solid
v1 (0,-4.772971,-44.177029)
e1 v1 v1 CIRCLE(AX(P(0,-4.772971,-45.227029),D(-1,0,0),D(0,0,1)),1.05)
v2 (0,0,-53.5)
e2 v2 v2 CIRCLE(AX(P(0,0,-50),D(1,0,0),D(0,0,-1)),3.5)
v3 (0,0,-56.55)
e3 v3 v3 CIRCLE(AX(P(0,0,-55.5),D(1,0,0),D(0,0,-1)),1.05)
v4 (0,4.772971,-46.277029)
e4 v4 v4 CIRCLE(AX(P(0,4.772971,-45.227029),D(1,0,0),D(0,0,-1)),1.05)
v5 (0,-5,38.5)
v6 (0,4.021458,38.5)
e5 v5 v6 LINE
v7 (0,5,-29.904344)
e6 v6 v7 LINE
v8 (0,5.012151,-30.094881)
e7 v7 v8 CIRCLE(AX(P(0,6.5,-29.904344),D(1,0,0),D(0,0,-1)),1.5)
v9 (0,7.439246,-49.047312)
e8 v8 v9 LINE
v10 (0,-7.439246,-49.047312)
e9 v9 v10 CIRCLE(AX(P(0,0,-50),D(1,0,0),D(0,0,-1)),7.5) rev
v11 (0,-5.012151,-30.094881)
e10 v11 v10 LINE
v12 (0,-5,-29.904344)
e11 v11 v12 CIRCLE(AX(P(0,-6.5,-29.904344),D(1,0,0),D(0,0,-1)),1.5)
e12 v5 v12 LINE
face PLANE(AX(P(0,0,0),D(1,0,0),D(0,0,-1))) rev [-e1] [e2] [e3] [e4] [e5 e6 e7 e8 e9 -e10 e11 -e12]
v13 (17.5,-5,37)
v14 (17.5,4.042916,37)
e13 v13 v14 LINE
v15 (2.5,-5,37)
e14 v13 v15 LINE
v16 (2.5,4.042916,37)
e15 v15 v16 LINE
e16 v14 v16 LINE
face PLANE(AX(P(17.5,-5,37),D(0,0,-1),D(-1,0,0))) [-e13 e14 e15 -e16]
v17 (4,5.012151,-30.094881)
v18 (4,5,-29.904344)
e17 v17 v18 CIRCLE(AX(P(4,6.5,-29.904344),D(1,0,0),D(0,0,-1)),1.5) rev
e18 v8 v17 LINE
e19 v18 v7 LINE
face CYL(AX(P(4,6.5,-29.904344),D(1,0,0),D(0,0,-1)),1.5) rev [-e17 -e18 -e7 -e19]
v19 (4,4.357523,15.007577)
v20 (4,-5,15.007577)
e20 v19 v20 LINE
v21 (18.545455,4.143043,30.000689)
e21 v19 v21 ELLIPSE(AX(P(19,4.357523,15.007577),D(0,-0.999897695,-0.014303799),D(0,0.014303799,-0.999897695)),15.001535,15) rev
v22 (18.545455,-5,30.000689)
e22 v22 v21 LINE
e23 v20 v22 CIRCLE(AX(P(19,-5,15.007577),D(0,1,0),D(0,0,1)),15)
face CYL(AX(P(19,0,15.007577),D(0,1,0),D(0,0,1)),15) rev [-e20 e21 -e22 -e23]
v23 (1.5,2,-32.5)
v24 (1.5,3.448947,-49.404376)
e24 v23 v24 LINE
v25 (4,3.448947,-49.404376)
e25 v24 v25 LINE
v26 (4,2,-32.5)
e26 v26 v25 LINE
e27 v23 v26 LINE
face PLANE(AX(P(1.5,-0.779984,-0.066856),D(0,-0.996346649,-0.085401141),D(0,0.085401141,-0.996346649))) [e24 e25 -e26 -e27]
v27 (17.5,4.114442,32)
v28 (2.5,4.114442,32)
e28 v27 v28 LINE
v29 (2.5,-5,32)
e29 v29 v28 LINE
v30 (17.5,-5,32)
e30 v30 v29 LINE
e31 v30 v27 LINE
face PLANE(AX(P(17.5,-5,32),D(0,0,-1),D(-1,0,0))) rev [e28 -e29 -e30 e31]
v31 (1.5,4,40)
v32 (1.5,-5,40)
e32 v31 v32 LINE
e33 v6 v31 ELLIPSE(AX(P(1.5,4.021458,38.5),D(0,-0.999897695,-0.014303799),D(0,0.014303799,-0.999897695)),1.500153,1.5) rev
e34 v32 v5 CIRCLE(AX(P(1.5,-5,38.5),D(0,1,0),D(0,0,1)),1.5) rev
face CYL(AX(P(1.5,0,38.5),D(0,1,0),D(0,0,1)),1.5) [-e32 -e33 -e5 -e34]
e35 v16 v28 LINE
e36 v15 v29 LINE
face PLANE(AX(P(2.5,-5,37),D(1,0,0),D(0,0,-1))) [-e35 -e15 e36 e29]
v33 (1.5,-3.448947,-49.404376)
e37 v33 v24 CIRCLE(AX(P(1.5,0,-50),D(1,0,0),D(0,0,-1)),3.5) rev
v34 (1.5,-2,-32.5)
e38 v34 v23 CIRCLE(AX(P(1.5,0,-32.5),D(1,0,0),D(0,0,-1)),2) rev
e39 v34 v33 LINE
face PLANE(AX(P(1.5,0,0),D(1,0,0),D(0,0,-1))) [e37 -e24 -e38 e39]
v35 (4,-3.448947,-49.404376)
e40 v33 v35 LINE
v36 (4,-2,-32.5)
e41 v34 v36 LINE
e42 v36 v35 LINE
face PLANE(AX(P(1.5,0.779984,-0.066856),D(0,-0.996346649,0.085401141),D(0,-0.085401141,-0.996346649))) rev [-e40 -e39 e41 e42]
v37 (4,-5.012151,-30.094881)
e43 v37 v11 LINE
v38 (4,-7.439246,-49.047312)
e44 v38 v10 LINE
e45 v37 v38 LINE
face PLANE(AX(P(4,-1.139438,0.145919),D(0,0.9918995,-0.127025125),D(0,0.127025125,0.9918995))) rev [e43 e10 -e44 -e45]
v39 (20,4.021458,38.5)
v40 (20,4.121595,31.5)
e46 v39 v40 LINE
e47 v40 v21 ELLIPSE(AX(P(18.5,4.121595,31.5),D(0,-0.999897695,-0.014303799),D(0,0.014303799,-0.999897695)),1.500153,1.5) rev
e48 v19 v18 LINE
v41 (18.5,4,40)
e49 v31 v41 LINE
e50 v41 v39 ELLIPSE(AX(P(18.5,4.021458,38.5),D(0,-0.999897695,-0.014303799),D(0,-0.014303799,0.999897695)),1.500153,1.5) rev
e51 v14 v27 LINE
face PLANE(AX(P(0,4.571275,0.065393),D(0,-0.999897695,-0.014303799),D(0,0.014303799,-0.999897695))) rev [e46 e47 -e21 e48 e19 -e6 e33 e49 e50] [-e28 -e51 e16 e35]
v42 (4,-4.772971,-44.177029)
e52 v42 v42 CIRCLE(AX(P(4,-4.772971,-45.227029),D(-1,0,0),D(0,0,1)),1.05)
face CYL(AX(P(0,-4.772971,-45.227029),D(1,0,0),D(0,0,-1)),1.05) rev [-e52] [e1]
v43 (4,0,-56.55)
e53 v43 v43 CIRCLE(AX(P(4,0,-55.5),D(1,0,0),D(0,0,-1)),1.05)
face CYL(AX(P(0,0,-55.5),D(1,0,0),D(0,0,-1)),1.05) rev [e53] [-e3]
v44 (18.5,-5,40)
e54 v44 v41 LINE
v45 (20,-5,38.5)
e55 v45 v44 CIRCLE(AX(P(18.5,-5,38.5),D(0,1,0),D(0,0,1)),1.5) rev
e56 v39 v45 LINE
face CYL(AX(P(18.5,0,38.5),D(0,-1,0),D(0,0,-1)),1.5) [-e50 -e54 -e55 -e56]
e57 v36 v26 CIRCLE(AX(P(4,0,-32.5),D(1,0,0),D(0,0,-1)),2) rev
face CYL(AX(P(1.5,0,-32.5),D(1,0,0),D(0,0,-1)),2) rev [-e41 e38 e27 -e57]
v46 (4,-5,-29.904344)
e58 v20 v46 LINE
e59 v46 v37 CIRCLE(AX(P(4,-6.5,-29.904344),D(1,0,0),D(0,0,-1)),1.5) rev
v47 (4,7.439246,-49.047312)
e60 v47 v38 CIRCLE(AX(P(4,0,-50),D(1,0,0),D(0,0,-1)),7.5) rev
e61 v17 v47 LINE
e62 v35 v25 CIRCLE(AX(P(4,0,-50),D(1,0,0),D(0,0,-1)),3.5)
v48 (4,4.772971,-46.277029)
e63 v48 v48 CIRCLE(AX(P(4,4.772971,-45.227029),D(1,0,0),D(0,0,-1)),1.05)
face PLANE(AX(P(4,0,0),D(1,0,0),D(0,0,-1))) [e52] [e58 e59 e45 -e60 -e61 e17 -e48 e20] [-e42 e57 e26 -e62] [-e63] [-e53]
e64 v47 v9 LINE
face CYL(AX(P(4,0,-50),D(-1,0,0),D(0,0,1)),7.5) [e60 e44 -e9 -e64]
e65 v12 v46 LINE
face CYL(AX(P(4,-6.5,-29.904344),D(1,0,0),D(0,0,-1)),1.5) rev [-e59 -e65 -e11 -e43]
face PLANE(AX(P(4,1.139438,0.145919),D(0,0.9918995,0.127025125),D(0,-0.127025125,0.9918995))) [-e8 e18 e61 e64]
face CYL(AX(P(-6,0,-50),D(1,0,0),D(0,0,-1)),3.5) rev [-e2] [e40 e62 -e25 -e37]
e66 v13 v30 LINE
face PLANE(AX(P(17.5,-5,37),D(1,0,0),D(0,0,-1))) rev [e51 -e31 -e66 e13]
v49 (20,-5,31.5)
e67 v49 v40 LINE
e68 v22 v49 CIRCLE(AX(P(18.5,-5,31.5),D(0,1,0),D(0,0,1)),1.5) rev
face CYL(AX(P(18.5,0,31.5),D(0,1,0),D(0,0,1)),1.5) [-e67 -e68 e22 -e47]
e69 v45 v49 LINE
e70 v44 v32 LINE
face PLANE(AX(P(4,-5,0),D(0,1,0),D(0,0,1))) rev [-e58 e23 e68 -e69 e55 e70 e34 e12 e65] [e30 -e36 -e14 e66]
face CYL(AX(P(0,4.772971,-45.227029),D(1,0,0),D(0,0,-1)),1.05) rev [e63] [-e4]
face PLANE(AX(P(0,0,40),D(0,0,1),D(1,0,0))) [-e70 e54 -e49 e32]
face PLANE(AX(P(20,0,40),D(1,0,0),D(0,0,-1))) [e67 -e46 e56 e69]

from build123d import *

# Parameters (mm, degrees)
BOSS_EXTRU_1_DEPTH      = 4
ESQUISSE2_R             = 3.5
ENL_V_MAT_EXTRU_1_DEPTH = 10
ENL_V_MAT_EXTRU_2_DEPTH = 2.5
ESQUISSE5_R             = 1.05
ENL_V_MAT_EXTRU_3_DEPTH = 59.124865591
ESQUISSE6_W             = 20
ESQUISSE6_H             = 10
BOSS_EXTRU_2_DEPTH      = 10
ESQUISSE7_W             = 15
ESQUISSE7_H             = 5
ENL_V_MAT_EXTRU_4_DEPTH = 10
CONG_2_R                = 1.5
CONG_3_R                = 15
ENL_V_START             = -20
ENL_V_MAT_EXTRU_5_DEPTH = 20


# Read off the part's stored shape, not the designer's step: Enlèv. mat.-Extru.5
with BuildPart() as part:
    # Esquisse1 → Boss.-Extru.1 (new body)
    with BuildSketch(Plane(origin=(0, 0, 0), x_dir=(0, 0, -1), z_dir=(1, 0, 0))):
        with BuildLine():
            Line((30, 5), (-30, 5))
            Line((-30, 5), (-30, -5))
            Line((-30, -5), (30, -5))
            Line((30, -5), (49.047311562, -7.439246248))
            ThreePointArc((49.047311562, -7.439246248), (57.484796152, -0.477311816), (50, 7.5))
            ThreePointArc((50, 7.5), (49.522688184, 7.484796152), (49.047311562, 7.439246248))
            Line((49.047311562, 7.439246248), (30, 5))
        make_face()
    extrude(amount=BOSS_EXTRU_1_DEPTH)

    # Esquisse2 → Enlèv. mat.-Extru.1 (cut)
    with BuildSketch(Plane(origin=(4, 0, 0), x_dir=(0, 0, -1), z_dir=(1, 0, 0))):
        with Locations((50, 0)):
            Circle(ESQUISSE2_R)
    extrude(amount=-ENL_V_MAT_EXTRU_1_DEPTH, mode=Mode.SUBTRACT)

    # Esquisse3 → Enlèv. mat.-Extru.2 (cut)
    with BuildSketch(Plane(origin=(4, 0, 0), x_dir=(0, 0, -1), z_dir=(1, 0, 0))):
        with BuildLine():
            Line((49.404376013, 3.448946515), (32.5, 2))
            ThreePointArc((32.5, 2), (30.5, 0), (32.5, -2))
            Line((32.5, -2), (49.404376013, -3.448946515))
            ThreePointArc((49.404376013, -3.448946515), (46.5, 0), (49.404376013, 3.448946515))
        make_face()
    extrude(amount=-ENL_V_MAT_EXTRU_2_DEPTH, mode=Mode.SUBTRACT)

    # Esquisse5 → Enlèv. mat.-Extru.3 (cut, through all)
    with BuildSketch(Plane(origin=(4, 0, 0), x_dir=(0, 0, -1), z_dir=(1, 0, 0))):
        with Locations((55.5, 0)):
            Circle(ESQUISSE5_R)
        with Locations((45.227029227, 4.772970773)):
            Circle(ESQUISSE5_R)
        with Locations(Location((45.227029227, -4.772970773, 0), (0, 0, 180))):
            Circle(ESQUISSE5_R)
    extrude(amount=-ENL_V_MAT_EXTRU_3_DEPTH, mode=Mode.SUBTRACT)

    # Esquisse6 → Boss.-Extru.2 (add)
    with BuildSketch(Plane.XY.offset(30)):
        with Locations((10, 0)):
            Rectangle(ESQUISSE6_W, ESQUISSE6_H)
    extrude(amount=BOSS_EXTRU_2_DEPTH)

    # Esquisse7 → Enlèv. mat.-Extru.4 (cut)
    with BuildSketch(Plane(origin=(0, 5, 0), x_dir=(1, 0, 0), z_dir=(0, 1, 0))):
        with Locations((10, -34.5)):
            Rectangle(ESQUISSE7_W, ESQUISSE7_H)
    extrude(amount=-ENL_V_MAT_EXTRU_4_DEPTH, mode=Mode.SUBTRACT)

    # Congé2
    cong_2_edges = [part.edges().sort_by_distance(p)[0] for p in [
        (2, -5, -30),
        (2, 5, -30),
        (20, 0, 40),
        (0, 0, 40),
        (20, 0, 30),
    ]]
    fillet(cong_2_edges, radius=CONG_2_R)

    # Congé3
    cong_3_edges = [part.edges().sort_by_distance(p)[0] for p in [
        (4, 0, 30),
    ]]
    fillet(cong_3_edges, radius=CONG_3_R)

    # Enlèv. mat.-Extru.5 outline → Enlèv. mat.-Extru.5 (cut)
    with BuildSketch(Plane(origin=(20, 0, 0), x_dir=(0, 0, -1), z_dir=(1, 0, 0)).offset(ENL_V_START)):
        Polygon((-40, 5), (-40, 4), (29.904343724, 5), align=None)
    extrude(amount=ENL_V_MAT_EXTRU_5_DEPTH, mode=Mode.SUBTRACT)


solid = part.part
